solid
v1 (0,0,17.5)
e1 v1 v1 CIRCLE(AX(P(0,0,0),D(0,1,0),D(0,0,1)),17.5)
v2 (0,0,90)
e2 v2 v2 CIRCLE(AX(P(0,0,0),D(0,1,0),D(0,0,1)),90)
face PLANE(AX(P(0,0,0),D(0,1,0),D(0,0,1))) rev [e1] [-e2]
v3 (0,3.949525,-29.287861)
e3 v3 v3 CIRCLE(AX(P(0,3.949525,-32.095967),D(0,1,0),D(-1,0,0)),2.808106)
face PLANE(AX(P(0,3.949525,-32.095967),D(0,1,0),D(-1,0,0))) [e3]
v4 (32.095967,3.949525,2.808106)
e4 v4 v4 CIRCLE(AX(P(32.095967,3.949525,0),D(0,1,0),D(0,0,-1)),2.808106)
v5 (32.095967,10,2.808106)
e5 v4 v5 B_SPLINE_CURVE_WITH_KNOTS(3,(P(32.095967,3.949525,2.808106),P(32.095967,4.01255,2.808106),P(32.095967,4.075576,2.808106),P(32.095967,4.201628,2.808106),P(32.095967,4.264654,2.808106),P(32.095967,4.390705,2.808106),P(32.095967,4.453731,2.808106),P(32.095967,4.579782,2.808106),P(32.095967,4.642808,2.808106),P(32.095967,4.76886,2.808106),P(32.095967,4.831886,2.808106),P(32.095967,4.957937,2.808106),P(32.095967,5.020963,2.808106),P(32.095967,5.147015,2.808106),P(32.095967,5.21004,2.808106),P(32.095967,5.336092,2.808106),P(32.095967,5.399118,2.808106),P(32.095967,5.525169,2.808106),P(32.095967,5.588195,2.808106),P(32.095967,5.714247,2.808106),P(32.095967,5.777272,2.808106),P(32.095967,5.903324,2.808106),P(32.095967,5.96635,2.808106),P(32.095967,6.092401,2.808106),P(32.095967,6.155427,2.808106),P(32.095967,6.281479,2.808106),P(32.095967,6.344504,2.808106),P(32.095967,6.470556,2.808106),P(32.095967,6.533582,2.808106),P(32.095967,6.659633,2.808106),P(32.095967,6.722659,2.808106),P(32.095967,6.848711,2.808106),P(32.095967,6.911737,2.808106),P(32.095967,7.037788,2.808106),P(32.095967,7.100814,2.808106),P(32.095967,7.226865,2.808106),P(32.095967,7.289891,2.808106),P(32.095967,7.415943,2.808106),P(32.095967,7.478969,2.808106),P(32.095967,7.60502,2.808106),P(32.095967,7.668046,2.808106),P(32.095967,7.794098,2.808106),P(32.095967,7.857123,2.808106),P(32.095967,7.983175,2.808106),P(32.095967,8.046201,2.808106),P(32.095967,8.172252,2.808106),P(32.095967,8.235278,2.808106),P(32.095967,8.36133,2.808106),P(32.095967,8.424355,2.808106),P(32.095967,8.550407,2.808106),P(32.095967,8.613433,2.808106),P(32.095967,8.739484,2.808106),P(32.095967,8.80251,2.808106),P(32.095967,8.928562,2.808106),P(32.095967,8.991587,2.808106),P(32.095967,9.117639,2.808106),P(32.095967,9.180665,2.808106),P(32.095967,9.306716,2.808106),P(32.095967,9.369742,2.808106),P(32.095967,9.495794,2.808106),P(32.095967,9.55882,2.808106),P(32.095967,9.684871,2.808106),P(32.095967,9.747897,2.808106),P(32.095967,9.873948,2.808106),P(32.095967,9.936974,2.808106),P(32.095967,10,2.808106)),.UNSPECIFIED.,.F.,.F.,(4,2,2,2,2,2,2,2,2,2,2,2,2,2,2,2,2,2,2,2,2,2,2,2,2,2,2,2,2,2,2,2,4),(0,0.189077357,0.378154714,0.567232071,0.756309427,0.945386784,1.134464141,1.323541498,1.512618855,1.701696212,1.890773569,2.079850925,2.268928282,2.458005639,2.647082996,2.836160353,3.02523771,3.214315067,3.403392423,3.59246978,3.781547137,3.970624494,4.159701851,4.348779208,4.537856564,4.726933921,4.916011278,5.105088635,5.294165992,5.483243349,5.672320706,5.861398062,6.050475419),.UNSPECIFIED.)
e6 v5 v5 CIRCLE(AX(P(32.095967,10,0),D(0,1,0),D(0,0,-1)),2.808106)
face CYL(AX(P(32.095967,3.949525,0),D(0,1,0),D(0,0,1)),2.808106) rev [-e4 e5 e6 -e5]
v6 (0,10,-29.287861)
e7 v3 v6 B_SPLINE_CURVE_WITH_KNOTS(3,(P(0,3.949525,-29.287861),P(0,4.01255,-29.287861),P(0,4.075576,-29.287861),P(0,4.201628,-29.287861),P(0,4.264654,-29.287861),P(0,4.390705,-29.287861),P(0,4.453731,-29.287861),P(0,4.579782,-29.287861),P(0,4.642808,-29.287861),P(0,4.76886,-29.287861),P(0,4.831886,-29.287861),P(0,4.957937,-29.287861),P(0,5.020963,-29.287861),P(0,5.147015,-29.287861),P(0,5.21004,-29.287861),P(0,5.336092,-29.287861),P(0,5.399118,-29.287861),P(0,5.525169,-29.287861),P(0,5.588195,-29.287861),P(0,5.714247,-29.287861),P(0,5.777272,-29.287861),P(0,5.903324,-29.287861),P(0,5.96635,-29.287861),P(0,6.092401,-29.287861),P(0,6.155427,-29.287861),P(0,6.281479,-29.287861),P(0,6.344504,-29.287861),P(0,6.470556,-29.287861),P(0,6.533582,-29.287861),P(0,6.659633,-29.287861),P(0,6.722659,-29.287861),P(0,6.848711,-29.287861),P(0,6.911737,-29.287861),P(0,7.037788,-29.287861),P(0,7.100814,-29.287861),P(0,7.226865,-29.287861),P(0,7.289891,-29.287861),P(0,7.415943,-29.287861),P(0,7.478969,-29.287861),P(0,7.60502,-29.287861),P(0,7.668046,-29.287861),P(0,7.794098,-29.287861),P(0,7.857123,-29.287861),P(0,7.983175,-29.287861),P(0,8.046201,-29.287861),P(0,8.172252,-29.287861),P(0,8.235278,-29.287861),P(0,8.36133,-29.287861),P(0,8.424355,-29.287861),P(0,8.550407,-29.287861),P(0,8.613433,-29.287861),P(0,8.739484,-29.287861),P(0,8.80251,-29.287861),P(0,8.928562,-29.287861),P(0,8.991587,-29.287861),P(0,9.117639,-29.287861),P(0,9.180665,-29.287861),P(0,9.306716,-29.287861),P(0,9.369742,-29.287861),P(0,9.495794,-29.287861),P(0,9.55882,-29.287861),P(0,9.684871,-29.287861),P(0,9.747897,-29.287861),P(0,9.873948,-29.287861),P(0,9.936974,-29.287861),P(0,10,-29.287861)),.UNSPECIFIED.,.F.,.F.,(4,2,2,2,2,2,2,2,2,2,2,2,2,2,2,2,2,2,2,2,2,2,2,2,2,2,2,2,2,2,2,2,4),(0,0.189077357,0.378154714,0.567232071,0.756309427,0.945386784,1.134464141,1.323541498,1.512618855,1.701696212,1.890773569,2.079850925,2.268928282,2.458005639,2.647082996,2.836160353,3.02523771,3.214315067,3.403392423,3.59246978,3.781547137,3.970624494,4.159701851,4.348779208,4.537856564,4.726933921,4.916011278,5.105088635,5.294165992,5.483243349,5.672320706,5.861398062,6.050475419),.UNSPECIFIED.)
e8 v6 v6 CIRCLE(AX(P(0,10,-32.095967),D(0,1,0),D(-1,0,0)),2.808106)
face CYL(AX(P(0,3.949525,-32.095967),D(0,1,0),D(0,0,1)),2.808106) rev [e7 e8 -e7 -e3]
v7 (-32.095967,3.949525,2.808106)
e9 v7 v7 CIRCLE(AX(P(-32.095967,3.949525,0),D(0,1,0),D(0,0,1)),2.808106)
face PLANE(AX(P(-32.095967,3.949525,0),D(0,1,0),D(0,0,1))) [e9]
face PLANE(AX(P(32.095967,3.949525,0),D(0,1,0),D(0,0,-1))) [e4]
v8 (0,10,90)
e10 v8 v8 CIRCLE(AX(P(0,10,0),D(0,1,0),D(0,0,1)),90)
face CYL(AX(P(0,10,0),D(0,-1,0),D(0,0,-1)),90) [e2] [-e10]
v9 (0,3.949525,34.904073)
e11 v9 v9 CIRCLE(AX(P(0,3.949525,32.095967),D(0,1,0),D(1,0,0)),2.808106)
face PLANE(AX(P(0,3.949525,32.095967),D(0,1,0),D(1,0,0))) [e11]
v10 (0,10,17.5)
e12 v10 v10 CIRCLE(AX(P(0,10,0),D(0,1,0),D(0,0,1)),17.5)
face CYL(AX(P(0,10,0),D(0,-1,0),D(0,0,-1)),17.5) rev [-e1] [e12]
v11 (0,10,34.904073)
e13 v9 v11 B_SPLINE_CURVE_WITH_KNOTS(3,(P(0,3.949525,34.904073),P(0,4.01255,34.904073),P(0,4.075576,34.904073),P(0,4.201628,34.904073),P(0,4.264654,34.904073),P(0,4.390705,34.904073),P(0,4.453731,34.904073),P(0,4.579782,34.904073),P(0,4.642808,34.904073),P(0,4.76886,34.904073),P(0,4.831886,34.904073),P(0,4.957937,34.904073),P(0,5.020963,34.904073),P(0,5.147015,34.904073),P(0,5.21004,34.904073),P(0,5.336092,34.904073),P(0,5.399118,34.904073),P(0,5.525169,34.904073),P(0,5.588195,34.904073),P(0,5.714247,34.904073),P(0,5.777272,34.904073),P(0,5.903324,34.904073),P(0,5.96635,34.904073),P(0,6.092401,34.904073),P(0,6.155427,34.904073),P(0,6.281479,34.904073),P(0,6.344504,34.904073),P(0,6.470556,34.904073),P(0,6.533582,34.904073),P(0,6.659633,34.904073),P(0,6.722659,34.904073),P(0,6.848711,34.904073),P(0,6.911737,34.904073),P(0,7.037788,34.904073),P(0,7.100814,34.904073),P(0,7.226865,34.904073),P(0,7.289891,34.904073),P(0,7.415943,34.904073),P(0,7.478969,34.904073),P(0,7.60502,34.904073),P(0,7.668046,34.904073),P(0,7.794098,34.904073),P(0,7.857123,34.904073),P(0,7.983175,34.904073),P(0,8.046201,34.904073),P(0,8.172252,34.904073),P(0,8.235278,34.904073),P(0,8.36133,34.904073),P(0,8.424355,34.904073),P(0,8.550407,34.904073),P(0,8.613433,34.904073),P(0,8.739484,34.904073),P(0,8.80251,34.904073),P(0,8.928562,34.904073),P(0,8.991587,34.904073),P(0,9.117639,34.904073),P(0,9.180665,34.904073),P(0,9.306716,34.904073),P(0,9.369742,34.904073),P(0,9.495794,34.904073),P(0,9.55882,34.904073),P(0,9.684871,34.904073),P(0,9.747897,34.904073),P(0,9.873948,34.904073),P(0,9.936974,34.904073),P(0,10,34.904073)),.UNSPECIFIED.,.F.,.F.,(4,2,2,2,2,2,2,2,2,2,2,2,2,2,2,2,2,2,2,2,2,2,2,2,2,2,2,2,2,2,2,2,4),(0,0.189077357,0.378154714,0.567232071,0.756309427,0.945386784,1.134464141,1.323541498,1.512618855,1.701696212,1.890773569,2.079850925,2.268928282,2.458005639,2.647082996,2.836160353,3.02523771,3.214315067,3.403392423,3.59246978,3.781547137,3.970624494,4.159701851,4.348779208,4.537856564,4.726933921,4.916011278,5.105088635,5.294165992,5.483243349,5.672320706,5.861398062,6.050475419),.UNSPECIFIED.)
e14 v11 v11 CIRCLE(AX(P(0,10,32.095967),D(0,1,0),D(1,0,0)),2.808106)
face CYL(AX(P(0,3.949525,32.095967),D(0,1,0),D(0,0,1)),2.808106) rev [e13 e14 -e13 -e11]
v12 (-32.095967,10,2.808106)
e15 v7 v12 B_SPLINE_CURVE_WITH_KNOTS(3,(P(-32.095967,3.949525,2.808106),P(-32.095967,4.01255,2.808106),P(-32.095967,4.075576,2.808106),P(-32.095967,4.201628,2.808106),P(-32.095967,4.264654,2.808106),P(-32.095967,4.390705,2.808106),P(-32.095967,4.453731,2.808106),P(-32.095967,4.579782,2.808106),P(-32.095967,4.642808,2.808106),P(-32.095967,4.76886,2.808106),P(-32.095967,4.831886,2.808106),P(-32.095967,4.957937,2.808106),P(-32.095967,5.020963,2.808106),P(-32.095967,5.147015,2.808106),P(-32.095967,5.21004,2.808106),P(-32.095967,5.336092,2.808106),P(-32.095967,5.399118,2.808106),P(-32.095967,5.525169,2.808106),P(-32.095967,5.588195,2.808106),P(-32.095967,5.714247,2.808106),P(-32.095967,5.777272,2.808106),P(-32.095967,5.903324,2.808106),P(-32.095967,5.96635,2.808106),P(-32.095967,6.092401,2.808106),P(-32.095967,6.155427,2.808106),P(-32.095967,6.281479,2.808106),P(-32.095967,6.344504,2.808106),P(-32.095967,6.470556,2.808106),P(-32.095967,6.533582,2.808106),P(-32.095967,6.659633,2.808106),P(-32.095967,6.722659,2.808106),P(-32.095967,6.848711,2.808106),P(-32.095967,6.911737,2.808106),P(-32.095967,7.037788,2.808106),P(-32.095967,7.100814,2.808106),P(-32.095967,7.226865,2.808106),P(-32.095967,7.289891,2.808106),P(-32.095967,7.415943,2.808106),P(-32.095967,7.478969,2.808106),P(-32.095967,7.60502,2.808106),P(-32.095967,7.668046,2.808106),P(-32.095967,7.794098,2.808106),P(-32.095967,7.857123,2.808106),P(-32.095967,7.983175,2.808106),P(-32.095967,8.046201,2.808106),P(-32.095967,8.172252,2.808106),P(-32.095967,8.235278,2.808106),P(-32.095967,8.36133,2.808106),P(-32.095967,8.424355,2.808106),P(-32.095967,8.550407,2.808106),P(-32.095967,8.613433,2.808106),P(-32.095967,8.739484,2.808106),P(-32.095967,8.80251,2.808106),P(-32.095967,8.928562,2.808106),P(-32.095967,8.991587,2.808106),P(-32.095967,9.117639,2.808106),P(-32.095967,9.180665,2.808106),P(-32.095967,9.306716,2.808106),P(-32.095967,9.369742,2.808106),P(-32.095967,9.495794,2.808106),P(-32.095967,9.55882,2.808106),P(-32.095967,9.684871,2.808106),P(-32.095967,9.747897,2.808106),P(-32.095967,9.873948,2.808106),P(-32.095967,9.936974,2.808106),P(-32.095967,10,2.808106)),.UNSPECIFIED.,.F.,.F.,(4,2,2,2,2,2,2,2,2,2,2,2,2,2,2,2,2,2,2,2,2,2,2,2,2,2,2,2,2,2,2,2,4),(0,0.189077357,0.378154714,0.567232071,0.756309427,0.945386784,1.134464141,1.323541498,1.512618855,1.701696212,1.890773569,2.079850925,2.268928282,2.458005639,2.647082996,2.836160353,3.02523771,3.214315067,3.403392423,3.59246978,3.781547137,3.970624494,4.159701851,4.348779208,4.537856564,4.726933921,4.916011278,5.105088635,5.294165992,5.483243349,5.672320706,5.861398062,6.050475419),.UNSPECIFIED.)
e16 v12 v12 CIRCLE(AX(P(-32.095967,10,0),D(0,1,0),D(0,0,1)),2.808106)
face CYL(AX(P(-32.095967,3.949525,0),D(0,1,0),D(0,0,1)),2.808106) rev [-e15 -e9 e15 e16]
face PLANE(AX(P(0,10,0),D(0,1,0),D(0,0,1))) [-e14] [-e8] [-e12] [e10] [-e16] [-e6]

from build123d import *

# Parameters (mm, degrees)
SKETCH1_R           = 90
BOSS_EXTRUDE1_DEPTH = 10
SKETCH2_R           = 17.5
CUT_EXTRUDE1_DEPTH  = 128.671453348
SKETCH3_R           = 2.80810623
CUT_EXTRUDE2_DEPTH  = 6.050475419
CIRPATTERN1_COUNT   = 4


with BuildPart() as part:
    # Sketch1 → Boss-Extrude1 (new body)
    with BuildSketch(Plane(origin=(0, 0, 0), x_dir=(1, 0, 0), z_dir=(0, 1, 0))):
        Circle(SKETCH1_R)
    extrude(amount=BOSS_EXTRUDE1_DEPTH)

    # Sketch2 → Cut-Extrude1 (cut, through all)
    with BuildSketch(Plane(origin=(0, 0, 0), x_dir=(1, 0, 0), z_dir=(0, 1, 0))):
        Circle(SKETCH2_R)
    extrude(amount=CUT_EXTRUDE1_DEPTH, mode=Mode.SUBTRACT)

    # Sketch3 → Cut-Extrude2 (cut)
    with BuildSketch(Plane(origin=(0, 10, 0), x_dir=(1, 0, 0), z_dir=(0, 1, 0))):
        with Locations((-32.095967149, 0)):
            Circle(SKETCH3_R)
    cut_extrude2 = extrude(amount=-CUT_EXTRUDE2_DEPTH, mode=Mode.SUBTRACT)

    # CirPattern1: Cut-Extrude2 ×4 about axis
    cirpattern1_axis = Axis((0, 0, 0), (0, 1, 0))
    for i in range(1, CIRPATTERN1_COUNT):
        add(cut_extrude2.rotate(cirpattern1_axis, i * 360 / CIRPATTERN1_COUNT), mode=Mode.SUBTRACT)


solid = part.part
